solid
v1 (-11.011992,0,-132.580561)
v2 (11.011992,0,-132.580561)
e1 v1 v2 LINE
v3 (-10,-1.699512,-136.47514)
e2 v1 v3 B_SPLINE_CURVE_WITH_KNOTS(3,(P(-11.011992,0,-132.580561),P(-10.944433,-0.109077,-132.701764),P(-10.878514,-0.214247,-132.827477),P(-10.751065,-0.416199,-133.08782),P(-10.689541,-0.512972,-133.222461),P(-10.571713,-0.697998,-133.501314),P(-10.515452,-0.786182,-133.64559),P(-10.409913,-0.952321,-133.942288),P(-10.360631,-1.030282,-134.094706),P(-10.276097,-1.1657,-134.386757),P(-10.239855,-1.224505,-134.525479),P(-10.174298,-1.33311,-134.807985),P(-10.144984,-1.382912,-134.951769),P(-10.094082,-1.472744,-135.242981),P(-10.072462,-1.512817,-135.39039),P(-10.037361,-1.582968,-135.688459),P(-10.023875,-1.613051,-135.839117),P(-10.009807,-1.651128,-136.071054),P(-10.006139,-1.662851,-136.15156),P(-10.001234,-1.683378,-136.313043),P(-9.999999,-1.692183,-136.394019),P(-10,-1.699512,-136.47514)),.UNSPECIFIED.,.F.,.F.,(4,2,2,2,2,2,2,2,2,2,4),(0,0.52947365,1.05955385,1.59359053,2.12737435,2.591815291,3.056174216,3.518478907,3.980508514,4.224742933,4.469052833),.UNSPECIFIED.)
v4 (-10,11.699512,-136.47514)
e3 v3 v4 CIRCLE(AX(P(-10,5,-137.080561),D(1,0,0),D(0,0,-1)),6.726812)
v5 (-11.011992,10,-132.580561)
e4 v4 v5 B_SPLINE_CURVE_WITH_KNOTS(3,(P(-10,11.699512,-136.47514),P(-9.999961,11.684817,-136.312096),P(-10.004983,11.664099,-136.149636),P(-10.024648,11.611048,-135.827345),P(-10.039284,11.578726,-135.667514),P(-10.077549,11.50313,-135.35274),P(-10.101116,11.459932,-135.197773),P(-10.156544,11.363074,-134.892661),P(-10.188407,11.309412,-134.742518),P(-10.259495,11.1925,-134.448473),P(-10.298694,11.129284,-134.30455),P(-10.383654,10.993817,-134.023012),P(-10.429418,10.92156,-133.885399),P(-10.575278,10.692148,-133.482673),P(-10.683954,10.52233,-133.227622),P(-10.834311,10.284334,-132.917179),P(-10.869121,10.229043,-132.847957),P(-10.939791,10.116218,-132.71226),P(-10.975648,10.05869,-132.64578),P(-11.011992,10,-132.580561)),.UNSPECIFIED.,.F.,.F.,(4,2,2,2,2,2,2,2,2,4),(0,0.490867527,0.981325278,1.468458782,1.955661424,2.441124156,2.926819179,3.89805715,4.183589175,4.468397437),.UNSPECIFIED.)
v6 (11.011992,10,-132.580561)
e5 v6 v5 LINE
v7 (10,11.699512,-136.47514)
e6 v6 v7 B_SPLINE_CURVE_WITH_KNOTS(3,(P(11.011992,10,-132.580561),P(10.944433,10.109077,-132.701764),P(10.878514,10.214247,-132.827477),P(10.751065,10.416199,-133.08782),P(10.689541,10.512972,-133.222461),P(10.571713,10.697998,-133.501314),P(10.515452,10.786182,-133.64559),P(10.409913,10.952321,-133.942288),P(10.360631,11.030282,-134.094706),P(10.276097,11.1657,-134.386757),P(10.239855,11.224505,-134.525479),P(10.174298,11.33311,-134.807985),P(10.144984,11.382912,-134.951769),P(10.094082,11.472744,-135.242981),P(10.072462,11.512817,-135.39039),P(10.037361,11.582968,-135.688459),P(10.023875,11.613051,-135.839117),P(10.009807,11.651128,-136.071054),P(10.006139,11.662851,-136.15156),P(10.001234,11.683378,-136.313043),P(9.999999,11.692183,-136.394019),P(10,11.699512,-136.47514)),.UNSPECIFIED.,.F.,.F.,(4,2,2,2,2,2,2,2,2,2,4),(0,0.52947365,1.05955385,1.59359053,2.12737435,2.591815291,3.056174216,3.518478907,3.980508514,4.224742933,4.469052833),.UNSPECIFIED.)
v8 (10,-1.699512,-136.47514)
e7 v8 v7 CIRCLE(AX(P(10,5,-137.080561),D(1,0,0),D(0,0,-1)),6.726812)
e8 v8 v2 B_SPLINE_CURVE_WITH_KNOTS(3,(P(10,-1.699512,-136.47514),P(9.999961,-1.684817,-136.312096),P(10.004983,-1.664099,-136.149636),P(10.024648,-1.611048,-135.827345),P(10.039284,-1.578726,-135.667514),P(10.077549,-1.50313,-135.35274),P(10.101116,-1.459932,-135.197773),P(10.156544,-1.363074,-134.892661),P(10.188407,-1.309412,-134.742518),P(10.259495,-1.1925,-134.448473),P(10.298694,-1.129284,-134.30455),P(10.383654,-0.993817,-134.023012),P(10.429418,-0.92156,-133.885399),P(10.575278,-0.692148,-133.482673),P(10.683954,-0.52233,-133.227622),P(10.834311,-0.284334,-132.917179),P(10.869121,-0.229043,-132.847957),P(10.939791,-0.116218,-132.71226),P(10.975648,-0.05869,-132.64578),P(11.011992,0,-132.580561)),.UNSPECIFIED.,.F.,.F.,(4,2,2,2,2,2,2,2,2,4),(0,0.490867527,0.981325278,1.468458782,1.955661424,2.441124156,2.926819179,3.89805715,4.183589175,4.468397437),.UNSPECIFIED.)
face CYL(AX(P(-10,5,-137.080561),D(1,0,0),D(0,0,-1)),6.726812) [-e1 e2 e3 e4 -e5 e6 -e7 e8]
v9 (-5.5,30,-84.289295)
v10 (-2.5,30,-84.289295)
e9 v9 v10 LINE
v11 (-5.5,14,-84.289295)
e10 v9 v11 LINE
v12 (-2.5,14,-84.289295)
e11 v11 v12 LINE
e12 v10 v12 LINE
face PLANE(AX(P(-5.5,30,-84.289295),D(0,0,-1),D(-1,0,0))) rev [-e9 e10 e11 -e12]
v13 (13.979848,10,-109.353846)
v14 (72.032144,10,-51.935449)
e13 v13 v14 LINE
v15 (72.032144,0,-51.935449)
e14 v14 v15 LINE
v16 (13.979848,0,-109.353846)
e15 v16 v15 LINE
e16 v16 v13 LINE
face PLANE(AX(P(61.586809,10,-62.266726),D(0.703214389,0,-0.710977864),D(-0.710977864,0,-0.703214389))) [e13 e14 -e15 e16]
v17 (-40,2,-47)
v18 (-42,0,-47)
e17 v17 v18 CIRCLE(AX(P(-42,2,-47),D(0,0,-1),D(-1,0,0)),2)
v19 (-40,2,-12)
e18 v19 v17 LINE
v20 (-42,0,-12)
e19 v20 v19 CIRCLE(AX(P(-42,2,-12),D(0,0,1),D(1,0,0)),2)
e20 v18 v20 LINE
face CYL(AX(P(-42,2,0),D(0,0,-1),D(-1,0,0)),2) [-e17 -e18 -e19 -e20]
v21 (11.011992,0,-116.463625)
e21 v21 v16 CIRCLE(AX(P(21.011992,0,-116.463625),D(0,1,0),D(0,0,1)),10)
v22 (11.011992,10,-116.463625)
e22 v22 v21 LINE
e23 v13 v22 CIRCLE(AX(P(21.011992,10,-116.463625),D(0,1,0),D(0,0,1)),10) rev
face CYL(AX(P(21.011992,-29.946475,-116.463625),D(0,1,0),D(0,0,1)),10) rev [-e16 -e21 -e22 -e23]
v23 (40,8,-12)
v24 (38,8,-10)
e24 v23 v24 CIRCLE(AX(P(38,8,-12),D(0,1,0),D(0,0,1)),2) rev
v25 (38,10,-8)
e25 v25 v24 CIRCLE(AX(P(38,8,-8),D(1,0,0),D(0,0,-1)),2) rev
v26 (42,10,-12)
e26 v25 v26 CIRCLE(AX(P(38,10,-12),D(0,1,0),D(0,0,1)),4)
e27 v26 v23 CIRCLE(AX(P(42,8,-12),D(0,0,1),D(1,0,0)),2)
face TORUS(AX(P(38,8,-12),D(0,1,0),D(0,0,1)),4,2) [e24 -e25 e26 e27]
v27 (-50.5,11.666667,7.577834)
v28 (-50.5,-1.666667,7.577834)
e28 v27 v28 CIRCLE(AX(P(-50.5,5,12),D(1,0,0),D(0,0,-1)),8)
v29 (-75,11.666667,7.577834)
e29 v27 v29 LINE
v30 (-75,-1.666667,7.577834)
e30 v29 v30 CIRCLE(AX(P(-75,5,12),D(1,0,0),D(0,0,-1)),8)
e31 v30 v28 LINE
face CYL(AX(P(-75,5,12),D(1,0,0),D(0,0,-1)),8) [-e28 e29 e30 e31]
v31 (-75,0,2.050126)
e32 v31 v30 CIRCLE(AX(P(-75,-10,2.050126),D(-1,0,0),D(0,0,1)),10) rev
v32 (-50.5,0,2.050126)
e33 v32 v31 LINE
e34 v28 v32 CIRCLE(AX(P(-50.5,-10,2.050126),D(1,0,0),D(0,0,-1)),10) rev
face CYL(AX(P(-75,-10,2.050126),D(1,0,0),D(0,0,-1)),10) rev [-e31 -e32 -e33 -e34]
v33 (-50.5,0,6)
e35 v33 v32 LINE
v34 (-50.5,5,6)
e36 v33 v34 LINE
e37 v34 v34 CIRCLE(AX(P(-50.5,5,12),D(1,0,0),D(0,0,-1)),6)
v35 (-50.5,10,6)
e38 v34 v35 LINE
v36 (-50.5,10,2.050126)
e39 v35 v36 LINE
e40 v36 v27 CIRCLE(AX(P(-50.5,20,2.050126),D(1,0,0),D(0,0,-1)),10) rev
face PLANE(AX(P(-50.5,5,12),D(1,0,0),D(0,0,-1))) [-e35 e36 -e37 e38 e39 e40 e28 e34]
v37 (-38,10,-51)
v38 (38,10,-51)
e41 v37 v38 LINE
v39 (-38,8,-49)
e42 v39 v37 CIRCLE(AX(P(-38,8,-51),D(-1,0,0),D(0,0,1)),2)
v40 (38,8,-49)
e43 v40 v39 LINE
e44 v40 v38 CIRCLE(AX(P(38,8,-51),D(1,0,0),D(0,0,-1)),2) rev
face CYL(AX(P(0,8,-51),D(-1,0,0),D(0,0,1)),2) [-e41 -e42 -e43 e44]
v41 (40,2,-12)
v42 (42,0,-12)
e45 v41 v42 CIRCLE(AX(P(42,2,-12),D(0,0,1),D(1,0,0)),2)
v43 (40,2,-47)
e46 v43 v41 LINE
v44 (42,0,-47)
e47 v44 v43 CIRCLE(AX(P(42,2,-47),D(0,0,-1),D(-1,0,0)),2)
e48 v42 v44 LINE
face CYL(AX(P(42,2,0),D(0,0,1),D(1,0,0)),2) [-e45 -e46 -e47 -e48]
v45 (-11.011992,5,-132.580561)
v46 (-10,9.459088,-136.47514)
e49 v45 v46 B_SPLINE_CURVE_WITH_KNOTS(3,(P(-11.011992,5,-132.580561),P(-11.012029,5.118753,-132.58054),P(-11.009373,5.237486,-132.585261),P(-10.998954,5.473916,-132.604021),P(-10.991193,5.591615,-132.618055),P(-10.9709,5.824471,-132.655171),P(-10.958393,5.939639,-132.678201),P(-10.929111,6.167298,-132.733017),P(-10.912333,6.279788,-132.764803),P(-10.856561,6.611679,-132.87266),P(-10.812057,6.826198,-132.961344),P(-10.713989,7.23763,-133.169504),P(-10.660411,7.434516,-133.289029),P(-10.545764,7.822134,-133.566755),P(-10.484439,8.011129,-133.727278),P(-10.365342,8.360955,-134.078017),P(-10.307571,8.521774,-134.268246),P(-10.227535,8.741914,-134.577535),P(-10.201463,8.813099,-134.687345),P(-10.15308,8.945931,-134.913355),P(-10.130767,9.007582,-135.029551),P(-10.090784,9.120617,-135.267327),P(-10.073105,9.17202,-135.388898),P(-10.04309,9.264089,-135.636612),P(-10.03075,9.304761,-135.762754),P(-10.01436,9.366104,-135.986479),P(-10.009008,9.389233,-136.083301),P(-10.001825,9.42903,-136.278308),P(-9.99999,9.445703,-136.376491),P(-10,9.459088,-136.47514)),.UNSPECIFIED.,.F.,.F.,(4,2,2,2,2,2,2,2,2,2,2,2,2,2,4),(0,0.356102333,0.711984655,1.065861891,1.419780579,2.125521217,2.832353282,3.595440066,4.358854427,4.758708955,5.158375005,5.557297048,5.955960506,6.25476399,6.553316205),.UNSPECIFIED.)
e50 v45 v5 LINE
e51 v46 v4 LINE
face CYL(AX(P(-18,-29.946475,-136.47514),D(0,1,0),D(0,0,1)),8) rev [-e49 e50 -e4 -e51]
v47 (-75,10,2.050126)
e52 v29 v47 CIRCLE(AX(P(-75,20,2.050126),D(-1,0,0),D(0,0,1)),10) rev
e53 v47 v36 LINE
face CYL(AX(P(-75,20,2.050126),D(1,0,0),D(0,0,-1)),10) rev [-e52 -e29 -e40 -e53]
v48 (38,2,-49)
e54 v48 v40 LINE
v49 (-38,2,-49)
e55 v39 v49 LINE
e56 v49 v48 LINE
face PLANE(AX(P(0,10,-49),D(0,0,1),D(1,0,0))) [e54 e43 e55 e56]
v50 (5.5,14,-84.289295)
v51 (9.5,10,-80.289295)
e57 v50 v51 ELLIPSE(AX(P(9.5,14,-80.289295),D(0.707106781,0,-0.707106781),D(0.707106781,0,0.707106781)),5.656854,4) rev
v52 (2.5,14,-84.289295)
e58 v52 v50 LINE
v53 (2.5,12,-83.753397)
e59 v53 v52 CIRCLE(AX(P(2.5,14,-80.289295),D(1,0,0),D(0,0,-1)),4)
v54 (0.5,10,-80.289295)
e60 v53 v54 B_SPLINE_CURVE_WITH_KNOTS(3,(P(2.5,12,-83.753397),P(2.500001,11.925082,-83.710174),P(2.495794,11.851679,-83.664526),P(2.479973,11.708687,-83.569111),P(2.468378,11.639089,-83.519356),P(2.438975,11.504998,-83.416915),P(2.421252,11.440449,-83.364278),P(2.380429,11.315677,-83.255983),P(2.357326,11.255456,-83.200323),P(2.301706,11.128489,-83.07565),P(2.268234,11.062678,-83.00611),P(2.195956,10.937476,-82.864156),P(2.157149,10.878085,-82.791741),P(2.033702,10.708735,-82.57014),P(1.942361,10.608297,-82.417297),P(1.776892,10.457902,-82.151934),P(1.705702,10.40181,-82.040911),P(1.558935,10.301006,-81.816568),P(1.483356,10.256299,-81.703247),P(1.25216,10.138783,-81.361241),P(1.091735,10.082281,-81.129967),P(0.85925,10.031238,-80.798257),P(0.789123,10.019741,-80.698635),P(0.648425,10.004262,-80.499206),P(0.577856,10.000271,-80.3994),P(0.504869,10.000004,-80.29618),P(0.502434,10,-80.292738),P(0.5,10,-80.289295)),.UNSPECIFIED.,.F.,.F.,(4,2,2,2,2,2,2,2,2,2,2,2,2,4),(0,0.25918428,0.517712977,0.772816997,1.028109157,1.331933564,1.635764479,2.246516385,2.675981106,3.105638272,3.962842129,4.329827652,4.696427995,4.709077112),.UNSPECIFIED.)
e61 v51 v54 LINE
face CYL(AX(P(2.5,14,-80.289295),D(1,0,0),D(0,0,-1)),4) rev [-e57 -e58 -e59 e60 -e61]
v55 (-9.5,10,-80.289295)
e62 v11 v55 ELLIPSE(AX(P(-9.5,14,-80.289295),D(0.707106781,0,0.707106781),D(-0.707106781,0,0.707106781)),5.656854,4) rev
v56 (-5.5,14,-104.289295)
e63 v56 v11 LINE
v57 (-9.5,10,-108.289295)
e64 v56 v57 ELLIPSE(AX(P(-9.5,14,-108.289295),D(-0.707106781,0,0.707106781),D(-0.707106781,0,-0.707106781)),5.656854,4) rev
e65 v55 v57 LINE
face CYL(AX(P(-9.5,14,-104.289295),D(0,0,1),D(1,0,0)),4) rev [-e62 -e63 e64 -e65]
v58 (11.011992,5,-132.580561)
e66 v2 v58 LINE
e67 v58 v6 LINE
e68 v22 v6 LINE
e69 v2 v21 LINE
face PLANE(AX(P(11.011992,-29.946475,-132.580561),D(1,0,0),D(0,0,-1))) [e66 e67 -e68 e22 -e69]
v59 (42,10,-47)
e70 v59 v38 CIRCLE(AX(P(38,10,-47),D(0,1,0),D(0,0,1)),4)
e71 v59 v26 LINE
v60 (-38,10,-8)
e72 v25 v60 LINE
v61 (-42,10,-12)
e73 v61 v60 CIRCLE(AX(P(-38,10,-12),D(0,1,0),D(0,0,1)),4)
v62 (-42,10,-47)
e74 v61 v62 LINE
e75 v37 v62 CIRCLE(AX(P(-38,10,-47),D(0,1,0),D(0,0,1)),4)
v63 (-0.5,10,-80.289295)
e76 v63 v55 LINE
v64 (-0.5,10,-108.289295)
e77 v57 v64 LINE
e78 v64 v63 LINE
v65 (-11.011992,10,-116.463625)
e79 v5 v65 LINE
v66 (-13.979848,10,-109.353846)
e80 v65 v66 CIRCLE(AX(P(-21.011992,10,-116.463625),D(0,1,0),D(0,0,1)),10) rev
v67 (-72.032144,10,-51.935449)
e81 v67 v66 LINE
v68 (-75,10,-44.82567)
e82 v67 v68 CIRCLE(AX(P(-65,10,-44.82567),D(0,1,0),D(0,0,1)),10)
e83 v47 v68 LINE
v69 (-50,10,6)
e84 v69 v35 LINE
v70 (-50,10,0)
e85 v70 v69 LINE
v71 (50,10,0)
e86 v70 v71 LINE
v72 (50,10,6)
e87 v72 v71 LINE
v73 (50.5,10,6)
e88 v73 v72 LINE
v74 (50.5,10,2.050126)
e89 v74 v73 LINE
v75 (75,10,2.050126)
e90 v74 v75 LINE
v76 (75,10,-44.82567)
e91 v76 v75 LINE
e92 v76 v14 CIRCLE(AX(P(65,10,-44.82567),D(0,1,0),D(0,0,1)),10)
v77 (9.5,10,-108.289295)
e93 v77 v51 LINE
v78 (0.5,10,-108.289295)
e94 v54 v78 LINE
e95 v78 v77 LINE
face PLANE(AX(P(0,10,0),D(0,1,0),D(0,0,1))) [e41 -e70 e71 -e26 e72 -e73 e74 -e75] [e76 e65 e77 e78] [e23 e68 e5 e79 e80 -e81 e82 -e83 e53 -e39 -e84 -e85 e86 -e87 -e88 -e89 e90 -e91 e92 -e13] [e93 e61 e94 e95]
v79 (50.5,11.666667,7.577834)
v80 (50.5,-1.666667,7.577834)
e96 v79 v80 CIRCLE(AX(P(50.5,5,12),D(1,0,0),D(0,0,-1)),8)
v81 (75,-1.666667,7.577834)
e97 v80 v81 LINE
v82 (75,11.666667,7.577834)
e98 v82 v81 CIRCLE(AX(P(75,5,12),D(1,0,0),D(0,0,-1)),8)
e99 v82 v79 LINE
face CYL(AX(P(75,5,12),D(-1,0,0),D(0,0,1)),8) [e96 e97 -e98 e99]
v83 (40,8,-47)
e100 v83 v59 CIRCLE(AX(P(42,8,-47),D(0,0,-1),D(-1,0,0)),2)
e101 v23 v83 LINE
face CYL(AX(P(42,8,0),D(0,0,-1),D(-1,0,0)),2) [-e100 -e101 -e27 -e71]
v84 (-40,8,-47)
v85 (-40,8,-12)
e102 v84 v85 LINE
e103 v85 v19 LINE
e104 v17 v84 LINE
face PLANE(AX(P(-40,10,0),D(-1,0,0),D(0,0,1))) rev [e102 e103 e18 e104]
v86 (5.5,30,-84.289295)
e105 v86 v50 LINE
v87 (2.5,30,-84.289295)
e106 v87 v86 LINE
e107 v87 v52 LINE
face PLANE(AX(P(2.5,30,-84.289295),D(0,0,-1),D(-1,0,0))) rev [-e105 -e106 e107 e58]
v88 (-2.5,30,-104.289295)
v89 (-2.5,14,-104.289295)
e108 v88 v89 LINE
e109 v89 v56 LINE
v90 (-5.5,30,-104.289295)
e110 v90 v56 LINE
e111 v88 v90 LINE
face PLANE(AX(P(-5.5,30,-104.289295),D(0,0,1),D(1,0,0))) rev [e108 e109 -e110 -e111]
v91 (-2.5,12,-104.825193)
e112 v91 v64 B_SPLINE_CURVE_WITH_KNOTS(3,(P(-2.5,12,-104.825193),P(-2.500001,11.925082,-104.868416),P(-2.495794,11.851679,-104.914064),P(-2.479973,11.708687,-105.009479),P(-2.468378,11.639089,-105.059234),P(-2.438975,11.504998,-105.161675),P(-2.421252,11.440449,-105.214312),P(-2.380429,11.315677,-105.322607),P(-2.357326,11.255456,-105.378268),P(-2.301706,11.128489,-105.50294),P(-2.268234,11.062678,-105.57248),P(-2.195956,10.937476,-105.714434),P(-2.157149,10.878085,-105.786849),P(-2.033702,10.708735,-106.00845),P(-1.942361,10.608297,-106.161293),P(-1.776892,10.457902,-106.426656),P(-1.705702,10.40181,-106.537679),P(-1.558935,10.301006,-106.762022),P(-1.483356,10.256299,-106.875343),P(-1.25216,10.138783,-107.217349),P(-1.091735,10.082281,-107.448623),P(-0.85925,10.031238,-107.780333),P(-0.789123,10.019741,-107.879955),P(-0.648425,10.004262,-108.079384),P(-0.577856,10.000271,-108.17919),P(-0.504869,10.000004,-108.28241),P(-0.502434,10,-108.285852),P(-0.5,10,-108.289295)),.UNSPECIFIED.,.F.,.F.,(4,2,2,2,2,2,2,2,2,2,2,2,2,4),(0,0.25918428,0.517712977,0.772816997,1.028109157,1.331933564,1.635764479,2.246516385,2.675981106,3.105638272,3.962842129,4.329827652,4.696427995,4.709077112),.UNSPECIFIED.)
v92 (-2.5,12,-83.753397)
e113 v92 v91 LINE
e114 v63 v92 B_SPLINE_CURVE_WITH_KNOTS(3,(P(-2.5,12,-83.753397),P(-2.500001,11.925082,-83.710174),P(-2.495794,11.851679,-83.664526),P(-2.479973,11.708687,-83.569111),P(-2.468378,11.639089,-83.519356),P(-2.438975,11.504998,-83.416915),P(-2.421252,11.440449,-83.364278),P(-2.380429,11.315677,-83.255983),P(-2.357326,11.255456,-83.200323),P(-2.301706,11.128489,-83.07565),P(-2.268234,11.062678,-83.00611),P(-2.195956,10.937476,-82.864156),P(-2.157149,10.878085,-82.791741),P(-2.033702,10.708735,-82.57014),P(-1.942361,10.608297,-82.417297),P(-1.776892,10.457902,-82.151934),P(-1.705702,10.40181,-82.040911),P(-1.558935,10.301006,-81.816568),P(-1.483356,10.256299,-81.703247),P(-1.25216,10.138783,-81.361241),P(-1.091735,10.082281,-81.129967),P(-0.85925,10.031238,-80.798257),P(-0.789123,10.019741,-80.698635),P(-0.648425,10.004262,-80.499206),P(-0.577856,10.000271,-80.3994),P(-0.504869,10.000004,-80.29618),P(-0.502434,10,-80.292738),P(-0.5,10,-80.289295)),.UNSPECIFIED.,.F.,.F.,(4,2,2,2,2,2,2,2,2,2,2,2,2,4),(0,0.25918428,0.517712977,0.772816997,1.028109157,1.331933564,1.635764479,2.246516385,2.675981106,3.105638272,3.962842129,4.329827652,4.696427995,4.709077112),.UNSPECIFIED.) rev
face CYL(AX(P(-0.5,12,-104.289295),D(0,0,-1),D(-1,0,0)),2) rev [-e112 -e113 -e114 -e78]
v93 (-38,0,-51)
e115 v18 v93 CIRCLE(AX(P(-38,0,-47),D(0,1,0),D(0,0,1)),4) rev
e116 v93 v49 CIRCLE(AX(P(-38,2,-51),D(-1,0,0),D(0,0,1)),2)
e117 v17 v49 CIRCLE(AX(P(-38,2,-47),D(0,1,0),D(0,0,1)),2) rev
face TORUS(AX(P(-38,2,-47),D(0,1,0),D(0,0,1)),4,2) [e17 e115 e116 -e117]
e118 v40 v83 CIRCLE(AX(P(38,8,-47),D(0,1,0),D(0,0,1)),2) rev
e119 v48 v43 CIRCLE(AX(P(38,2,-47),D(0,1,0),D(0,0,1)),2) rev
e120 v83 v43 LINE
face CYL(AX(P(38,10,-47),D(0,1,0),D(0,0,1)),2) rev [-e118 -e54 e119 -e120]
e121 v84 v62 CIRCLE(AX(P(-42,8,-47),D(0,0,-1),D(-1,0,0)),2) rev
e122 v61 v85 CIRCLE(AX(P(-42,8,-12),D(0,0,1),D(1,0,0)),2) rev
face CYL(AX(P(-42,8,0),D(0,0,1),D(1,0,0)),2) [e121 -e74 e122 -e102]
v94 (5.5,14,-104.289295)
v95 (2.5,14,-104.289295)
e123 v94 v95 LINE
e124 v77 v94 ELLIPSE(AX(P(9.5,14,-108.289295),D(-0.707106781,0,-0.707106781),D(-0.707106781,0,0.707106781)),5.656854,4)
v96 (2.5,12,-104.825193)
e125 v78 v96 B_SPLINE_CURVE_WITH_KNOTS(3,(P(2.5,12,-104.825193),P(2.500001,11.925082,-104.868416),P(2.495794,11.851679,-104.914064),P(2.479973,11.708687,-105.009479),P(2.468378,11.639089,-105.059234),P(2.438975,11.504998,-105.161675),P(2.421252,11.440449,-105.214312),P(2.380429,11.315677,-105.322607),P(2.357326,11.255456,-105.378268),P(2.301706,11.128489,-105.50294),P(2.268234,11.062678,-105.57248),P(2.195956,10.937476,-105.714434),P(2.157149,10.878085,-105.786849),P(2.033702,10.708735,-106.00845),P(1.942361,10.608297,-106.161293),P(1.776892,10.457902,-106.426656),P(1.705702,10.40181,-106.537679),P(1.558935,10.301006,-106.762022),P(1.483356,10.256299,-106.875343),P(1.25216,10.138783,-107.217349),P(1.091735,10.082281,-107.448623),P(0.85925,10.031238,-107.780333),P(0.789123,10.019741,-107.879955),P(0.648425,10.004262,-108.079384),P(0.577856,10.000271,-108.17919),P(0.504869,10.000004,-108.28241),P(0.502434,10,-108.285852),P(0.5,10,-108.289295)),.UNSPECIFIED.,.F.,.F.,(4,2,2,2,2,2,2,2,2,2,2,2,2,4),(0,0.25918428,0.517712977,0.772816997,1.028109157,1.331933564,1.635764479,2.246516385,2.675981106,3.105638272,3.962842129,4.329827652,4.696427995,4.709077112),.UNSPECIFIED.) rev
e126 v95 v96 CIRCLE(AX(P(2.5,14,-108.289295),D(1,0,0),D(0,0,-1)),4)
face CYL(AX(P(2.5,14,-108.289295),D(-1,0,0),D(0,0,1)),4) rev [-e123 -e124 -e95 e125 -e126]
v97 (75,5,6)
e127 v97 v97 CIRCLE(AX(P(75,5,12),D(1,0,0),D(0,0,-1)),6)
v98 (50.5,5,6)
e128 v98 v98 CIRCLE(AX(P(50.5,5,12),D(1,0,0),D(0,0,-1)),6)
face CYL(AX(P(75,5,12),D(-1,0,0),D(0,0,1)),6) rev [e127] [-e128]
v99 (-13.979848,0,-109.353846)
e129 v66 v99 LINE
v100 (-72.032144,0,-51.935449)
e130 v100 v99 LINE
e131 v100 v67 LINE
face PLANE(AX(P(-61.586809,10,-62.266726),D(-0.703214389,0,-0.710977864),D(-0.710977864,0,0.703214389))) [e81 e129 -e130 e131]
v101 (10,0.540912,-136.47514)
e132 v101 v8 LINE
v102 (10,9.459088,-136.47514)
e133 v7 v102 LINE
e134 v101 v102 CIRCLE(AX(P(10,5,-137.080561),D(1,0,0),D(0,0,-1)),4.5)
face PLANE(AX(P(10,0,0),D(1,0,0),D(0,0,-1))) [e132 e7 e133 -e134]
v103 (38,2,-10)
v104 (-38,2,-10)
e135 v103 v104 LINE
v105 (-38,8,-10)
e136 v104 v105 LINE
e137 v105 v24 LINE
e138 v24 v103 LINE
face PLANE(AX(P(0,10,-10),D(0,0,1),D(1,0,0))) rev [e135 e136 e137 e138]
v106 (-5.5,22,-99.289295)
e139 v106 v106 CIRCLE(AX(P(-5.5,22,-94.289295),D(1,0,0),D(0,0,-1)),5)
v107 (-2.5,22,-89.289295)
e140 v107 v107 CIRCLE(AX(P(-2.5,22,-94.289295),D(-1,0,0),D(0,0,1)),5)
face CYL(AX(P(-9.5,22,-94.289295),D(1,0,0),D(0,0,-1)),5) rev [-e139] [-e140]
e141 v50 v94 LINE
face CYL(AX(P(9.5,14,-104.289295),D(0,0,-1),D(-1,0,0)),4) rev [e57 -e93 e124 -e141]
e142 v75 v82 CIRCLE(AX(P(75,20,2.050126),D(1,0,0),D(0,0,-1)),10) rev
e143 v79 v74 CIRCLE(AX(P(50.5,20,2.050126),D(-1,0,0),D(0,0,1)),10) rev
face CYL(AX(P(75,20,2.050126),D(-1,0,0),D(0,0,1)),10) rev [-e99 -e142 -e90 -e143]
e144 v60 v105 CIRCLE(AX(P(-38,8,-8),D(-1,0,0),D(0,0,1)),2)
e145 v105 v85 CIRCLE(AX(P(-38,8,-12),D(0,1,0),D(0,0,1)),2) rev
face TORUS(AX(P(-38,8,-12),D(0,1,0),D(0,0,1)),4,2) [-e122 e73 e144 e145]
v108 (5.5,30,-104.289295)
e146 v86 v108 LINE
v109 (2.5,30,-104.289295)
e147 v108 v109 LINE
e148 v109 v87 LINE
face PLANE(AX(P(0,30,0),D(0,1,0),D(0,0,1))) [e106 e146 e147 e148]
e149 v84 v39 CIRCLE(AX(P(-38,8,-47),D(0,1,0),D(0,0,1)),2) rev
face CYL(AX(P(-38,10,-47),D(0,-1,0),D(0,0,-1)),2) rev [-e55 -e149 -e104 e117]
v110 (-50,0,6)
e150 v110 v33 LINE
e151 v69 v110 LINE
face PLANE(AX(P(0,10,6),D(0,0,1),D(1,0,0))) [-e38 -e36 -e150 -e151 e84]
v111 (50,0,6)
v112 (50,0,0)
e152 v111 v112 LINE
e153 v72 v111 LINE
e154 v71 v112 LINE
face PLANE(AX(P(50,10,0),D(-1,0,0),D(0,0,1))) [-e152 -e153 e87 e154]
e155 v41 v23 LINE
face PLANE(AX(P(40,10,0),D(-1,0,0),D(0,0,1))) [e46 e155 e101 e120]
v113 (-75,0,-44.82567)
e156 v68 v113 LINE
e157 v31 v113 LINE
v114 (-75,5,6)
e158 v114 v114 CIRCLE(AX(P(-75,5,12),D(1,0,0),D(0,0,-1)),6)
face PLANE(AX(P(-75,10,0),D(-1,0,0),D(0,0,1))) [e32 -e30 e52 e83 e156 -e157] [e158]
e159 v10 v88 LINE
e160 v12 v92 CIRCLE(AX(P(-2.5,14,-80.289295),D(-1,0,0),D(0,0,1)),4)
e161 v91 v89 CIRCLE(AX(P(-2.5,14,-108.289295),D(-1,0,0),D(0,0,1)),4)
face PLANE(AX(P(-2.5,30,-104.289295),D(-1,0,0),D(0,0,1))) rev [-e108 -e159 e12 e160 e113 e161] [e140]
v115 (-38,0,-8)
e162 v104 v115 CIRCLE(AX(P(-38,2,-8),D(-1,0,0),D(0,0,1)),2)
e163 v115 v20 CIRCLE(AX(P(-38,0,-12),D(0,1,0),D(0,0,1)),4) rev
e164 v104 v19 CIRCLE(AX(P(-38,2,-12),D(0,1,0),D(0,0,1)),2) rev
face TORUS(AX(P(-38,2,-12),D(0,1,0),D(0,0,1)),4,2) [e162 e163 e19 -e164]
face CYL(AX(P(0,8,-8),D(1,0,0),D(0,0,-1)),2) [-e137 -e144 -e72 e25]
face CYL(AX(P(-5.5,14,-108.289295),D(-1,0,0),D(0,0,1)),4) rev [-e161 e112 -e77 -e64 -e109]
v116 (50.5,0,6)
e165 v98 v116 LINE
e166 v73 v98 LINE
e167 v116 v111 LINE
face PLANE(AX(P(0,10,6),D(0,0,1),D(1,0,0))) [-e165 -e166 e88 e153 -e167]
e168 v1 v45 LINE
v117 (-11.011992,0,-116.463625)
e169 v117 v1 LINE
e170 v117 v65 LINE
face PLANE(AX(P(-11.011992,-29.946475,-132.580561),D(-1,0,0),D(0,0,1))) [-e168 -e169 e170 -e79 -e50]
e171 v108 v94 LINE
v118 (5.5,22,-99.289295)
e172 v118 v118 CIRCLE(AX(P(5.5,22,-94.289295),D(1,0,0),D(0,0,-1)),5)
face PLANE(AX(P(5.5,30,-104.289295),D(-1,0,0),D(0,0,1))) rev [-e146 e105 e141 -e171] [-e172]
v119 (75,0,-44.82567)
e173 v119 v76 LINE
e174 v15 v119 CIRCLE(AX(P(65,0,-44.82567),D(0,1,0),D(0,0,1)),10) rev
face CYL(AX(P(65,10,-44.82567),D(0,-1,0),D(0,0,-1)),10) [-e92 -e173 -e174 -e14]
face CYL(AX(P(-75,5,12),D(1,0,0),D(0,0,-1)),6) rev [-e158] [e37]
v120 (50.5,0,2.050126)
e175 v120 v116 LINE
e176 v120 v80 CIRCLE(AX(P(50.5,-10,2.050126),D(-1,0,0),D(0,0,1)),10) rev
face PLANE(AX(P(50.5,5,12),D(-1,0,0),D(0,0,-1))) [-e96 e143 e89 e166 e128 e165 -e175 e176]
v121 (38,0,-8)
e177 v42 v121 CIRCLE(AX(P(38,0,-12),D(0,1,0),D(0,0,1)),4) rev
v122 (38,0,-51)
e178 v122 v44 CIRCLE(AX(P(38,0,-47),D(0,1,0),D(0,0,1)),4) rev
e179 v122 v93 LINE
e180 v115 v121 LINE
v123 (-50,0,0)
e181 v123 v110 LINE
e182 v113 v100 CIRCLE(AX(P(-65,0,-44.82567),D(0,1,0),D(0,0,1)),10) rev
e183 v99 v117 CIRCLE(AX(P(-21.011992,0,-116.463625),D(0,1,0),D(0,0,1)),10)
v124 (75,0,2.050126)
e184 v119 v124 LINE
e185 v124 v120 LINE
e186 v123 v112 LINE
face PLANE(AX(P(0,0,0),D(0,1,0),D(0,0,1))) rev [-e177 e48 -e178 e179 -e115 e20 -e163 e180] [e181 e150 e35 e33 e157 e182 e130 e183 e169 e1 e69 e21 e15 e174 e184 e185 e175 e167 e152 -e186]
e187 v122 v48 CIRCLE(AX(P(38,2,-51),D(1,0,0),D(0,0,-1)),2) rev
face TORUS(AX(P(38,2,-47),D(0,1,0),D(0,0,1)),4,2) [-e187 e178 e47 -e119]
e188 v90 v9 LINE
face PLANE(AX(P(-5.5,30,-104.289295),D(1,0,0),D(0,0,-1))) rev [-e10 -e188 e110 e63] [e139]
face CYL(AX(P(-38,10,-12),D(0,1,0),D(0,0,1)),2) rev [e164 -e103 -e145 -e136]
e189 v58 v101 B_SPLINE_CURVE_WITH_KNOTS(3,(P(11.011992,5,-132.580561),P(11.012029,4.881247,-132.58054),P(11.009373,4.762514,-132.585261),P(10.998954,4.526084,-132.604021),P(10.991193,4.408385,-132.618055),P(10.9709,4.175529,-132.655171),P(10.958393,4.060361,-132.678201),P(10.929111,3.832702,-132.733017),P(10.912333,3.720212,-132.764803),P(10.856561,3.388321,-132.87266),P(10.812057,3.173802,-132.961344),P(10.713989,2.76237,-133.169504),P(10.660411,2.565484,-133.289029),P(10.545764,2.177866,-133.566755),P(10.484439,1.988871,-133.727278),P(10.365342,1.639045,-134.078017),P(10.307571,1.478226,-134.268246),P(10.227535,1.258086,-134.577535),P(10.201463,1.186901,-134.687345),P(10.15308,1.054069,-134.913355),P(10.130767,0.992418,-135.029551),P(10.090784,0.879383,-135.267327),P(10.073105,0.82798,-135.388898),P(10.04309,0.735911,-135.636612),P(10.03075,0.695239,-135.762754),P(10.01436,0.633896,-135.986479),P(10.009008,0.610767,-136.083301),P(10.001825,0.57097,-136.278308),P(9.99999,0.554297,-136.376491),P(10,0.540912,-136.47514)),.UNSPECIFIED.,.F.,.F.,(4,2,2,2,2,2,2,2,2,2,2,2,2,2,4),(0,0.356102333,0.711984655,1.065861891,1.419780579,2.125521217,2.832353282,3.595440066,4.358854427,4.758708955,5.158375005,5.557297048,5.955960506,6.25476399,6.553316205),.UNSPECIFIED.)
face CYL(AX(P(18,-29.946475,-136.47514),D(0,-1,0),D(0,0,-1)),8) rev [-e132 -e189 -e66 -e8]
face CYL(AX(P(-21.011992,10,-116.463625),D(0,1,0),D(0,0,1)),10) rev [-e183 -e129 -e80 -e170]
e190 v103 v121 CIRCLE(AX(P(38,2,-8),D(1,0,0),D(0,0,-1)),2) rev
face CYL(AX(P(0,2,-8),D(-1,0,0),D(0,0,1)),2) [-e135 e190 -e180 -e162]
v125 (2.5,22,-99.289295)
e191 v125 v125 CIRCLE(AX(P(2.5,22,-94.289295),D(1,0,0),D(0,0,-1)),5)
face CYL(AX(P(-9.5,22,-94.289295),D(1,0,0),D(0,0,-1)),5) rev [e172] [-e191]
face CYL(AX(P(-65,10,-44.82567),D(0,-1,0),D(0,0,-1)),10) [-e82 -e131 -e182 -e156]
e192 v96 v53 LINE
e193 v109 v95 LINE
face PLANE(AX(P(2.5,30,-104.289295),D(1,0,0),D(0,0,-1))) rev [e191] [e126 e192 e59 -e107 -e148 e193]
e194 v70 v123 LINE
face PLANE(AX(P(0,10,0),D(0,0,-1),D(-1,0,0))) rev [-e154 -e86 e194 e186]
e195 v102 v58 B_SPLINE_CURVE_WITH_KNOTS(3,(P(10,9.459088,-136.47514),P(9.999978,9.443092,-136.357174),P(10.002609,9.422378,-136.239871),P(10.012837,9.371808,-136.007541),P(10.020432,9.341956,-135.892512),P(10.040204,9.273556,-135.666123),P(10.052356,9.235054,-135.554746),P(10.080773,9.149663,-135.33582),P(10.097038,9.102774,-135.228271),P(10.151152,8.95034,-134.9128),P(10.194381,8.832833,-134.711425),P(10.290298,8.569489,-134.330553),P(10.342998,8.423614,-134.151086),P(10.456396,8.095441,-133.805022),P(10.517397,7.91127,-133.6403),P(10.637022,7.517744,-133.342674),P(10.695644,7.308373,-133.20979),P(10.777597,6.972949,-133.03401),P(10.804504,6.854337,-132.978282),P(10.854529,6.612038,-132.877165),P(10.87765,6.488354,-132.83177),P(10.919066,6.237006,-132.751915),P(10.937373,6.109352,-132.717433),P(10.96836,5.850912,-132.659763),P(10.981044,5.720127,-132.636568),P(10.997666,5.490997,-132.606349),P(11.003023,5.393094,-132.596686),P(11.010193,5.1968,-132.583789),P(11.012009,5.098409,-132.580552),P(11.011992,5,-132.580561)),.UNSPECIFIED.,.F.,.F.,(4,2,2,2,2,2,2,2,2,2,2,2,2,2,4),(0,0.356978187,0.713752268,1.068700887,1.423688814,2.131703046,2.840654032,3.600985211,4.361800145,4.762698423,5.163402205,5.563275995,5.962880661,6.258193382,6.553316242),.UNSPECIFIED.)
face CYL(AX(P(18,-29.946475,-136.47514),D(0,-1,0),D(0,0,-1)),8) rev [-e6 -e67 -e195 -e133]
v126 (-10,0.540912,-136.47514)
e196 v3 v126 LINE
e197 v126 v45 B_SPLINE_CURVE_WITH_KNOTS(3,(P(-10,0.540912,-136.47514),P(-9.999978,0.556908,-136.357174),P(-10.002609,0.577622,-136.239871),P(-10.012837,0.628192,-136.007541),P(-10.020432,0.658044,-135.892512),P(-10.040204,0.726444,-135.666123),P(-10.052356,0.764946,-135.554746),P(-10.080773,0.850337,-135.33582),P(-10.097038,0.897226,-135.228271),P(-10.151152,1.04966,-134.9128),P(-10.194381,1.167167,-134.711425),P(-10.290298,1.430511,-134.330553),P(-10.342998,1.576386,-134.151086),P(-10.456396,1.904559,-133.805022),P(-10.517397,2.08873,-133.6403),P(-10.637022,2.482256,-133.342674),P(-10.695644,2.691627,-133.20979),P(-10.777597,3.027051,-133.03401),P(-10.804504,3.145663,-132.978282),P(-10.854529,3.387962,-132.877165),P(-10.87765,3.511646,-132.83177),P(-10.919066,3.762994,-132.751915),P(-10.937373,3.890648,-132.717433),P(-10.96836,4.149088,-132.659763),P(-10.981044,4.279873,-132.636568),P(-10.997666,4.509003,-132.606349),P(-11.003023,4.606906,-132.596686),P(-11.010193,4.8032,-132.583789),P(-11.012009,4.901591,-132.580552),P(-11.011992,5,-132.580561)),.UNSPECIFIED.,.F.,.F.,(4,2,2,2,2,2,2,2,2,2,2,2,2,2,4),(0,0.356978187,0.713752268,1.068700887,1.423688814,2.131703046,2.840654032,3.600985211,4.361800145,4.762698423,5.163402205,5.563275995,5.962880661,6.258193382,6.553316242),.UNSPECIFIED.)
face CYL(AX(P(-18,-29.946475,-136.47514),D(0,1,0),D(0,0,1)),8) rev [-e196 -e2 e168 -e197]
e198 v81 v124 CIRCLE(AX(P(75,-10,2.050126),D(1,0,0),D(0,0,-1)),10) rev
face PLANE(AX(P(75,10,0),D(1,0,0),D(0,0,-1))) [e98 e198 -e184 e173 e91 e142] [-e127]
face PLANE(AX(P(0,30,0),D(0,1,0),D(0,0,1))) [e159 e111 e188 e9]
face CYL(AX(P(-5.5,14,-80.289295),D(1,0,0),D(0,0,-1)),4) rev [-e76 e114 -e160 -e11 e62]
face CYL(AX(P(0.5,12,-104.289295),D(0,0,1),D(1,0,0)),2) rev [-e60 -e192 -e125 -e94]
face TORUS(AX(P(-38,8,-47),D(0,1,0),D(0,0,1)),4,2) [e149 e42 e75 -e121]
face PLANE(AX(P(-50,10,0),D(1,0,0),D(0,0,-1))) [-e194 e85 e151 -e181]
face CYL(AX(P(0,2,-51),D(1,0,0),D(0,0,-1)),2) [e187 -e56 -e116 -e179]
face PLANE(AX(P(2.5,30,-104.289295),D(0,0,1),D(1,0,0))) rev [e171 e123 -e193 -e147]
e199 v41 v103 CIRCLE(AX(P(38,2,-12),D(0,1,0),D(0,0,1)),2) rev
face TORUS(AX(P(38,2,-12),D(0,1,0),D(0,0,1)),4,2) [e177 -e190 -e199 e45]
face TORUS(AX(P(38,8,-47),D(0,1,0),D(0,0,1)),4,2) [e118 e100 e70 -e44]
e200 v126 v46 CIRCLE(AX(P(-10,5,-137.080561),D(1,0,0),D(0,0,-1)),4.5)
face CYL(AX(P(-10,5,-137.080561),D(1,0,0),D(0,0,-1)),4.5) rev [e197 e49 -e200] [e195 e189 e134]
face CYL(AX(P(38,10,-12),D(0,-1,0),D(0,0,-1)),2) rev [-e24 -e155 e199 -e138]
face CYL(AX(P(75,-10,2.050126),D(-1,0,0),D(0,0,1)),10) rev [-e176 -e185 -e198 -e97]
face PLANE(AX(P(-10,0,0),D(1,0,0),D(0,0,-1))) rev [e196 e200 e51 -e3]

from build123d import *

# Parameters (mm, degrees)
SKETCH1_W                = 80
SKETCH1_H                = 39
BOSS_EXTRUDE1_DEPTH      = 10
BOSS_EXTRUDE2_START      = -12.5
SKETCH4_R                = 8
SKETCH4_R_2              = 6
BOSS_EXTRUDE2_DEPTH      = 24.5
SKETCH10_W               = 22.023984498
SKETCH10_H               = 20.291265962
BOSS_EXTRUDE4_DEPTH      = 10
SKETCH13_W               = 3
SKETCH13_H               = 20
BOSS_EXTRUDE5_DEPTH      = 20
SKETCH14_R               = 5
CUT_EXTRUDE1_DEPTH       = 15
BOSS_EXTRUDE6_DEPTH      = 10
BOSS_EXTRUDE6_DEPTH_BACK = 10
SKETCH16_R               = 6.726812024
SKETCH16_R_2             = 4.5
FILLET2_R                = 4
FILLET4_R                = 2
FILLET8_R                = 10
FILLET9_R                = 8
FILLET15_R               = 4
FILLET16_R               = 2


with BuildPart() as part:
    # Sketch1 → Boss-Extrude1 (new body)
    with BuildSketch(Plane(origin=(0, 0, 0), x_dir=(1, 0, 0), z_dir=(0, 1, 0))):
        Polygon((11.011992249, 112.28929502), (75, 49), (75, -6), (50, -6), (50, 0), (-50, 0), (-50, -6), (-75, -6), (-75, 49), (-11.011992249, 112.28929502), align=None)
        with Locations((0, 29.5)):
            Rectangle(SKETCH1_W, SKETCH1_H, mode=Mode.SUBTRACT)
    extrude(amount=BOSS_EXTRUDE1_DEPTH)

    # Sketch4 → Boss-Extrude2 (add)
    with BuildSketch(Plane(origin=(-62.5, 0, 0), x_dir=(0, 0, -1), z_dir=(1, 0, 0)).offset(BOSS_EXTRUDE2_START)):
        with Locations((-12, 5)):
            Circle(SKETCH4_R)
        with Locations((-12, 5)):
            Circle(SKETCH4_R_2, mode=Mode.SUBTRACT)
    boss_extrude2 = extrude(amount=BOSS_EXTRUDE2_DEPTH)

    # Mirror1: Boss-Extrude2 across plane
    add(boss_extrude2.mirror(Plane(origin=(0, 0, 0), x_dir=(0, 0, 1), z_dir=(1, 0, 0))))

    # Sketch10 → Boss-Extrude4 (add)
    with BuildSketch(Plane(origin=(0, 10, 0), x_dir=(1, 0, 0), z_dir=(0, 1, 0))):
        with Locations((0, 122.434928001)):
            Rectangle(SKETCH10_W, SKETCH10_H)
    extrude(amount=-BOSS_EXTRUDE4_DEPTH)

    # Sketch13 → Boss-Extrude5 (add)
    with BuildSketch(Plane(origin=(0, 10, 0), x_dir=(1, 0, 0), z_dir=(0, 1, 0))):
        with Locations((-4, 94.28929502)):
            Rectangle(SKETCH13_W, SKETCH13_H)
        with Locations((4, 94.28929502)):
            Rectangle(SKETCH13_W, SKETCH13_H)
    extrude(amount=BOSS_EXTRUDE5_DEPTH)

    # Sketch14 → Cut-Extrude1 (cut)
    with BuildSketch(Plane(origin=(5.5, 0, 0), x_dir=(0, 0, -1), z_dir=(1, 0, 0))):
        with Locations((94.28929502, 22)):
            Circle(SKETCH14_R)
    extrude(amount=-CUT_EXTRUDE1_DEPTH, mode=Mode.SUBTRACT)

    # Sketch16 → Boss-Extrude6 (add, two sides: drawn at the far end of the back side and taken through both)
    with BuildSketch(Plane(origin=(0, 0, 0), x_dir=(0, 0, -1), z_dir=(1, 0, 0)).offset(-BOSS_EXTRUDE6_DEPTH_BACK)):
        with Locations((137.080560982, 5)):
            Circle(SKETCH16_R)
        with Locations(Location((137.080560982, 5, 0), (0, 0, 180))):
            Circle(SKETCH16_R_2, mode=Mode.SUBTRACT)
    extrude(amount=BOSS_EXTRUDE6_DEPTH + BOSS_EXTRUDE6_DEPTH_BACK)

    # Fillet2
    fillet2_edges = [part.edges().sort_by_distance(p)[0] for p in [
        (-4, 10, -104.28929502),
        (-5.5, 10, -94.28929502),
        (-4, 10, -84.28929502),
    ]]
    fillet(fillet2_edges, radius=FILLET2_R)

    # Fillet4
    fillet4_edges = [part.edges().sort_by_distance(p)[0] for p in [
        (40, 0, -29.5),
        (0, 0, -49),
        (-40, 0, -29.5),
        (0, 0, -10),
        (40, 5, -10),
        (40, 5, -49),
        (-40, 5, -49),
        (-40, 5, -10),
        (0, 10, -10),
        (-40, 10, -29.5),
        (0, 10, -49),
        (40, 10, -29.5),
    ]]
    fillet(fillet4_edges, radius=FILLET4_R)

    # Fillet8
    fillet8_edges = [part.edges().sort_by_distance(p)[0] for p in [
        (11.011992249, 5, -112.28929502),
        (75, 5, -49),
        (-75, 5, -49),
        (-11.011992249, 5, -112.28929502),
        (-62.75, 0, 5.755002002),
        (-62.75, 10, 5.755002002),
        (62.75, 0, 5.755002002),
        (62.75, 10, 5.755002002),
    ]]
    fillet(fillet8_edges, radius=FILLET8_R)

    # Fillet9
    # the kernel refuses this fillet: 8 mm, written as the material it adds along each edge
    with BuildSketch(Plane(origin=(10, 5, -132.580560982), x_dir=(1, 0, 0), z_dir=(0, -1, 0))) as fillet9_piece_1_section:
        with BuildLine():
            CenterArc((8, -3.894579268), FILLET9_R, 150.868059199, 29.131940801)
            Line((0, -3.894579268), (0, 0))
            Line((0, 0), (1.011992249, 0))
        make_face()
    fillet9_piece_1 = extrude(amount=14.73644817, mode=Mode.PRIVATE)
    fillet9_piece_1 = fillet9_piece_1 - Plane(origin=(10, 5, -137.080560982), x_dir=(0, 0, 1), z_dir=(-1, 0, 0)) * Cylinder(4.5, 46, mode=Mode.PRIVATE)
    fillet9_piece_1 = fillet9_piece_1 & Plane(origin=(10, 5, -137.080560982), x_dir=(0, 0, -1), z_dir=(-1, 0, 0)) * Cylinder(6.726812024, 46, mode=Mode.PRIVATE)
    add(fillet9_piece_1)
    with BuildSketch(Plane(origin=(10, 19.73644817, -132.580560982), x_dir=(1, 0, 0), z_dir=(0, -1, 0))) as fillet9_piece_2_section:
        with BuildLine():
            CenterArc((8, -3.894579268), FILLET9_R, 150.868059199, 29.131940801)
            Line((0, -3.894579268), (0, 0))
            Line((0, 0), (1.011992249, 0))
        make_face()
    fillet9_piece_2 = extrude(amount=14.73644817, mode=Mode.PRIVATE)
    fillet9_piece_2 = fillet9_piece_2 - Plane(origin=(10, 5, -137.080560982), x_dir=(0, 0, 1), z_dir=(-1, 0, 0)) * Cylinder(4.5, 46, mode=Mode.PRIVATE)
    fillet9_piece_2 = fillet9_piece_2 & Plane(origin=(10, 5, -137.080560982), x_dir=(0, 0, -1), z_dir=(-1, 0, 0)) * Cylinder(6.726812024, 46, mode=Mode.PRIVATE)
    add(fillet9_piece_2)
    with BuildSketch(Plane(origin=(-10, 5, -132.580560982), x_dir=(0, 0, -1), z_dir=(0, -1, 0))) as fillet9_piece_3_section:
        with BuildLine():
            CenterArc((3.894579268, -8), FILLET9_R, 90, 29.131940801)
            Line((0, -1.011992249), (0, 0))
            Line((0, 0), (3.894579268, 0))
        make_face()
    fillet9_piece_3 = extrude(amount=14.73644817, mode=Mode.PRIVATE)
    fillet9_piece_3 = fillet9_piece_3 - Plane(origin=(-10, 5, -137.080560982), x_dir=(0, 0, 1), z_dir=(-1, 0, 0)) * Cylinder(4.5, 46, mode=Mode.PRIVATE)
    fillet9_piece_3 = fillet9_piece_3 & Plane(origin=(-10, 5, -137.080560982), x_dir=(0, 0, -1), z_dir=(-1, 0, 0)) * Cylinder(6.726812024, 46, mode=Mode.PRIVATE)
    add(fillet9_piece_3)
    with BuildSketch(Plane(origin=(-10, 19.73644817, -132.580560982), x_dir=(0, 0, -1), z_dir=(0, -1, 0))) as fillet9_piece_4_section:
        with BuildLine():
            CenterArc((3.894579268, -8), FILLET9_R, 90, 29.131940801)
            Line((0, -1.011992249), (0, 0))
            Line((0, 0), (3.894579268, 0))
        make_face()
    fillet9_piece_4 = extrude(amount=14.73644817, mode=Mode.PRIVATE)
    fillet9_piece_4 = fillet9_piece_4 - Plane(origin=(-10, 5, -137.080560982), x_dir=(0, 0, 1), z_dir=(-1, 0, 0)) * Cylinder(4.5, 46, mode=Mode.PRIVATE)
    fillet9_piece_4 = fillet9_piece_4 & Plane(origin=(-10, 5, -137.080560982), x_dir=(0, 0, -1), z_dir=(-1, 0, 0)) * Cylinder(6.726812024, 46, mode=Mode.PRIVATE)
    add(fillet9_piece_4)

    # Fillet15
    fillet15_edges = [part.edges().sort_by_distance(p)[0] for p in [
        (5.5, 10, -94.28929502),
        (4, 10, -104.28929502),
        (4, 10, -84.28929502),
    ]]
    fillet(fillet15_edges, radius=FILLET15_R)

    # Fillet16
    fillet16_edges = [part.edges().sort_by_distance(p)[0] for p in [
        (2.5, 10, -94.28929502),
        (-2.5, 10, -94.28929502),
    ]]
    fillet(fillet16_edges, radius=FILLET16_R)


solid = part.part
